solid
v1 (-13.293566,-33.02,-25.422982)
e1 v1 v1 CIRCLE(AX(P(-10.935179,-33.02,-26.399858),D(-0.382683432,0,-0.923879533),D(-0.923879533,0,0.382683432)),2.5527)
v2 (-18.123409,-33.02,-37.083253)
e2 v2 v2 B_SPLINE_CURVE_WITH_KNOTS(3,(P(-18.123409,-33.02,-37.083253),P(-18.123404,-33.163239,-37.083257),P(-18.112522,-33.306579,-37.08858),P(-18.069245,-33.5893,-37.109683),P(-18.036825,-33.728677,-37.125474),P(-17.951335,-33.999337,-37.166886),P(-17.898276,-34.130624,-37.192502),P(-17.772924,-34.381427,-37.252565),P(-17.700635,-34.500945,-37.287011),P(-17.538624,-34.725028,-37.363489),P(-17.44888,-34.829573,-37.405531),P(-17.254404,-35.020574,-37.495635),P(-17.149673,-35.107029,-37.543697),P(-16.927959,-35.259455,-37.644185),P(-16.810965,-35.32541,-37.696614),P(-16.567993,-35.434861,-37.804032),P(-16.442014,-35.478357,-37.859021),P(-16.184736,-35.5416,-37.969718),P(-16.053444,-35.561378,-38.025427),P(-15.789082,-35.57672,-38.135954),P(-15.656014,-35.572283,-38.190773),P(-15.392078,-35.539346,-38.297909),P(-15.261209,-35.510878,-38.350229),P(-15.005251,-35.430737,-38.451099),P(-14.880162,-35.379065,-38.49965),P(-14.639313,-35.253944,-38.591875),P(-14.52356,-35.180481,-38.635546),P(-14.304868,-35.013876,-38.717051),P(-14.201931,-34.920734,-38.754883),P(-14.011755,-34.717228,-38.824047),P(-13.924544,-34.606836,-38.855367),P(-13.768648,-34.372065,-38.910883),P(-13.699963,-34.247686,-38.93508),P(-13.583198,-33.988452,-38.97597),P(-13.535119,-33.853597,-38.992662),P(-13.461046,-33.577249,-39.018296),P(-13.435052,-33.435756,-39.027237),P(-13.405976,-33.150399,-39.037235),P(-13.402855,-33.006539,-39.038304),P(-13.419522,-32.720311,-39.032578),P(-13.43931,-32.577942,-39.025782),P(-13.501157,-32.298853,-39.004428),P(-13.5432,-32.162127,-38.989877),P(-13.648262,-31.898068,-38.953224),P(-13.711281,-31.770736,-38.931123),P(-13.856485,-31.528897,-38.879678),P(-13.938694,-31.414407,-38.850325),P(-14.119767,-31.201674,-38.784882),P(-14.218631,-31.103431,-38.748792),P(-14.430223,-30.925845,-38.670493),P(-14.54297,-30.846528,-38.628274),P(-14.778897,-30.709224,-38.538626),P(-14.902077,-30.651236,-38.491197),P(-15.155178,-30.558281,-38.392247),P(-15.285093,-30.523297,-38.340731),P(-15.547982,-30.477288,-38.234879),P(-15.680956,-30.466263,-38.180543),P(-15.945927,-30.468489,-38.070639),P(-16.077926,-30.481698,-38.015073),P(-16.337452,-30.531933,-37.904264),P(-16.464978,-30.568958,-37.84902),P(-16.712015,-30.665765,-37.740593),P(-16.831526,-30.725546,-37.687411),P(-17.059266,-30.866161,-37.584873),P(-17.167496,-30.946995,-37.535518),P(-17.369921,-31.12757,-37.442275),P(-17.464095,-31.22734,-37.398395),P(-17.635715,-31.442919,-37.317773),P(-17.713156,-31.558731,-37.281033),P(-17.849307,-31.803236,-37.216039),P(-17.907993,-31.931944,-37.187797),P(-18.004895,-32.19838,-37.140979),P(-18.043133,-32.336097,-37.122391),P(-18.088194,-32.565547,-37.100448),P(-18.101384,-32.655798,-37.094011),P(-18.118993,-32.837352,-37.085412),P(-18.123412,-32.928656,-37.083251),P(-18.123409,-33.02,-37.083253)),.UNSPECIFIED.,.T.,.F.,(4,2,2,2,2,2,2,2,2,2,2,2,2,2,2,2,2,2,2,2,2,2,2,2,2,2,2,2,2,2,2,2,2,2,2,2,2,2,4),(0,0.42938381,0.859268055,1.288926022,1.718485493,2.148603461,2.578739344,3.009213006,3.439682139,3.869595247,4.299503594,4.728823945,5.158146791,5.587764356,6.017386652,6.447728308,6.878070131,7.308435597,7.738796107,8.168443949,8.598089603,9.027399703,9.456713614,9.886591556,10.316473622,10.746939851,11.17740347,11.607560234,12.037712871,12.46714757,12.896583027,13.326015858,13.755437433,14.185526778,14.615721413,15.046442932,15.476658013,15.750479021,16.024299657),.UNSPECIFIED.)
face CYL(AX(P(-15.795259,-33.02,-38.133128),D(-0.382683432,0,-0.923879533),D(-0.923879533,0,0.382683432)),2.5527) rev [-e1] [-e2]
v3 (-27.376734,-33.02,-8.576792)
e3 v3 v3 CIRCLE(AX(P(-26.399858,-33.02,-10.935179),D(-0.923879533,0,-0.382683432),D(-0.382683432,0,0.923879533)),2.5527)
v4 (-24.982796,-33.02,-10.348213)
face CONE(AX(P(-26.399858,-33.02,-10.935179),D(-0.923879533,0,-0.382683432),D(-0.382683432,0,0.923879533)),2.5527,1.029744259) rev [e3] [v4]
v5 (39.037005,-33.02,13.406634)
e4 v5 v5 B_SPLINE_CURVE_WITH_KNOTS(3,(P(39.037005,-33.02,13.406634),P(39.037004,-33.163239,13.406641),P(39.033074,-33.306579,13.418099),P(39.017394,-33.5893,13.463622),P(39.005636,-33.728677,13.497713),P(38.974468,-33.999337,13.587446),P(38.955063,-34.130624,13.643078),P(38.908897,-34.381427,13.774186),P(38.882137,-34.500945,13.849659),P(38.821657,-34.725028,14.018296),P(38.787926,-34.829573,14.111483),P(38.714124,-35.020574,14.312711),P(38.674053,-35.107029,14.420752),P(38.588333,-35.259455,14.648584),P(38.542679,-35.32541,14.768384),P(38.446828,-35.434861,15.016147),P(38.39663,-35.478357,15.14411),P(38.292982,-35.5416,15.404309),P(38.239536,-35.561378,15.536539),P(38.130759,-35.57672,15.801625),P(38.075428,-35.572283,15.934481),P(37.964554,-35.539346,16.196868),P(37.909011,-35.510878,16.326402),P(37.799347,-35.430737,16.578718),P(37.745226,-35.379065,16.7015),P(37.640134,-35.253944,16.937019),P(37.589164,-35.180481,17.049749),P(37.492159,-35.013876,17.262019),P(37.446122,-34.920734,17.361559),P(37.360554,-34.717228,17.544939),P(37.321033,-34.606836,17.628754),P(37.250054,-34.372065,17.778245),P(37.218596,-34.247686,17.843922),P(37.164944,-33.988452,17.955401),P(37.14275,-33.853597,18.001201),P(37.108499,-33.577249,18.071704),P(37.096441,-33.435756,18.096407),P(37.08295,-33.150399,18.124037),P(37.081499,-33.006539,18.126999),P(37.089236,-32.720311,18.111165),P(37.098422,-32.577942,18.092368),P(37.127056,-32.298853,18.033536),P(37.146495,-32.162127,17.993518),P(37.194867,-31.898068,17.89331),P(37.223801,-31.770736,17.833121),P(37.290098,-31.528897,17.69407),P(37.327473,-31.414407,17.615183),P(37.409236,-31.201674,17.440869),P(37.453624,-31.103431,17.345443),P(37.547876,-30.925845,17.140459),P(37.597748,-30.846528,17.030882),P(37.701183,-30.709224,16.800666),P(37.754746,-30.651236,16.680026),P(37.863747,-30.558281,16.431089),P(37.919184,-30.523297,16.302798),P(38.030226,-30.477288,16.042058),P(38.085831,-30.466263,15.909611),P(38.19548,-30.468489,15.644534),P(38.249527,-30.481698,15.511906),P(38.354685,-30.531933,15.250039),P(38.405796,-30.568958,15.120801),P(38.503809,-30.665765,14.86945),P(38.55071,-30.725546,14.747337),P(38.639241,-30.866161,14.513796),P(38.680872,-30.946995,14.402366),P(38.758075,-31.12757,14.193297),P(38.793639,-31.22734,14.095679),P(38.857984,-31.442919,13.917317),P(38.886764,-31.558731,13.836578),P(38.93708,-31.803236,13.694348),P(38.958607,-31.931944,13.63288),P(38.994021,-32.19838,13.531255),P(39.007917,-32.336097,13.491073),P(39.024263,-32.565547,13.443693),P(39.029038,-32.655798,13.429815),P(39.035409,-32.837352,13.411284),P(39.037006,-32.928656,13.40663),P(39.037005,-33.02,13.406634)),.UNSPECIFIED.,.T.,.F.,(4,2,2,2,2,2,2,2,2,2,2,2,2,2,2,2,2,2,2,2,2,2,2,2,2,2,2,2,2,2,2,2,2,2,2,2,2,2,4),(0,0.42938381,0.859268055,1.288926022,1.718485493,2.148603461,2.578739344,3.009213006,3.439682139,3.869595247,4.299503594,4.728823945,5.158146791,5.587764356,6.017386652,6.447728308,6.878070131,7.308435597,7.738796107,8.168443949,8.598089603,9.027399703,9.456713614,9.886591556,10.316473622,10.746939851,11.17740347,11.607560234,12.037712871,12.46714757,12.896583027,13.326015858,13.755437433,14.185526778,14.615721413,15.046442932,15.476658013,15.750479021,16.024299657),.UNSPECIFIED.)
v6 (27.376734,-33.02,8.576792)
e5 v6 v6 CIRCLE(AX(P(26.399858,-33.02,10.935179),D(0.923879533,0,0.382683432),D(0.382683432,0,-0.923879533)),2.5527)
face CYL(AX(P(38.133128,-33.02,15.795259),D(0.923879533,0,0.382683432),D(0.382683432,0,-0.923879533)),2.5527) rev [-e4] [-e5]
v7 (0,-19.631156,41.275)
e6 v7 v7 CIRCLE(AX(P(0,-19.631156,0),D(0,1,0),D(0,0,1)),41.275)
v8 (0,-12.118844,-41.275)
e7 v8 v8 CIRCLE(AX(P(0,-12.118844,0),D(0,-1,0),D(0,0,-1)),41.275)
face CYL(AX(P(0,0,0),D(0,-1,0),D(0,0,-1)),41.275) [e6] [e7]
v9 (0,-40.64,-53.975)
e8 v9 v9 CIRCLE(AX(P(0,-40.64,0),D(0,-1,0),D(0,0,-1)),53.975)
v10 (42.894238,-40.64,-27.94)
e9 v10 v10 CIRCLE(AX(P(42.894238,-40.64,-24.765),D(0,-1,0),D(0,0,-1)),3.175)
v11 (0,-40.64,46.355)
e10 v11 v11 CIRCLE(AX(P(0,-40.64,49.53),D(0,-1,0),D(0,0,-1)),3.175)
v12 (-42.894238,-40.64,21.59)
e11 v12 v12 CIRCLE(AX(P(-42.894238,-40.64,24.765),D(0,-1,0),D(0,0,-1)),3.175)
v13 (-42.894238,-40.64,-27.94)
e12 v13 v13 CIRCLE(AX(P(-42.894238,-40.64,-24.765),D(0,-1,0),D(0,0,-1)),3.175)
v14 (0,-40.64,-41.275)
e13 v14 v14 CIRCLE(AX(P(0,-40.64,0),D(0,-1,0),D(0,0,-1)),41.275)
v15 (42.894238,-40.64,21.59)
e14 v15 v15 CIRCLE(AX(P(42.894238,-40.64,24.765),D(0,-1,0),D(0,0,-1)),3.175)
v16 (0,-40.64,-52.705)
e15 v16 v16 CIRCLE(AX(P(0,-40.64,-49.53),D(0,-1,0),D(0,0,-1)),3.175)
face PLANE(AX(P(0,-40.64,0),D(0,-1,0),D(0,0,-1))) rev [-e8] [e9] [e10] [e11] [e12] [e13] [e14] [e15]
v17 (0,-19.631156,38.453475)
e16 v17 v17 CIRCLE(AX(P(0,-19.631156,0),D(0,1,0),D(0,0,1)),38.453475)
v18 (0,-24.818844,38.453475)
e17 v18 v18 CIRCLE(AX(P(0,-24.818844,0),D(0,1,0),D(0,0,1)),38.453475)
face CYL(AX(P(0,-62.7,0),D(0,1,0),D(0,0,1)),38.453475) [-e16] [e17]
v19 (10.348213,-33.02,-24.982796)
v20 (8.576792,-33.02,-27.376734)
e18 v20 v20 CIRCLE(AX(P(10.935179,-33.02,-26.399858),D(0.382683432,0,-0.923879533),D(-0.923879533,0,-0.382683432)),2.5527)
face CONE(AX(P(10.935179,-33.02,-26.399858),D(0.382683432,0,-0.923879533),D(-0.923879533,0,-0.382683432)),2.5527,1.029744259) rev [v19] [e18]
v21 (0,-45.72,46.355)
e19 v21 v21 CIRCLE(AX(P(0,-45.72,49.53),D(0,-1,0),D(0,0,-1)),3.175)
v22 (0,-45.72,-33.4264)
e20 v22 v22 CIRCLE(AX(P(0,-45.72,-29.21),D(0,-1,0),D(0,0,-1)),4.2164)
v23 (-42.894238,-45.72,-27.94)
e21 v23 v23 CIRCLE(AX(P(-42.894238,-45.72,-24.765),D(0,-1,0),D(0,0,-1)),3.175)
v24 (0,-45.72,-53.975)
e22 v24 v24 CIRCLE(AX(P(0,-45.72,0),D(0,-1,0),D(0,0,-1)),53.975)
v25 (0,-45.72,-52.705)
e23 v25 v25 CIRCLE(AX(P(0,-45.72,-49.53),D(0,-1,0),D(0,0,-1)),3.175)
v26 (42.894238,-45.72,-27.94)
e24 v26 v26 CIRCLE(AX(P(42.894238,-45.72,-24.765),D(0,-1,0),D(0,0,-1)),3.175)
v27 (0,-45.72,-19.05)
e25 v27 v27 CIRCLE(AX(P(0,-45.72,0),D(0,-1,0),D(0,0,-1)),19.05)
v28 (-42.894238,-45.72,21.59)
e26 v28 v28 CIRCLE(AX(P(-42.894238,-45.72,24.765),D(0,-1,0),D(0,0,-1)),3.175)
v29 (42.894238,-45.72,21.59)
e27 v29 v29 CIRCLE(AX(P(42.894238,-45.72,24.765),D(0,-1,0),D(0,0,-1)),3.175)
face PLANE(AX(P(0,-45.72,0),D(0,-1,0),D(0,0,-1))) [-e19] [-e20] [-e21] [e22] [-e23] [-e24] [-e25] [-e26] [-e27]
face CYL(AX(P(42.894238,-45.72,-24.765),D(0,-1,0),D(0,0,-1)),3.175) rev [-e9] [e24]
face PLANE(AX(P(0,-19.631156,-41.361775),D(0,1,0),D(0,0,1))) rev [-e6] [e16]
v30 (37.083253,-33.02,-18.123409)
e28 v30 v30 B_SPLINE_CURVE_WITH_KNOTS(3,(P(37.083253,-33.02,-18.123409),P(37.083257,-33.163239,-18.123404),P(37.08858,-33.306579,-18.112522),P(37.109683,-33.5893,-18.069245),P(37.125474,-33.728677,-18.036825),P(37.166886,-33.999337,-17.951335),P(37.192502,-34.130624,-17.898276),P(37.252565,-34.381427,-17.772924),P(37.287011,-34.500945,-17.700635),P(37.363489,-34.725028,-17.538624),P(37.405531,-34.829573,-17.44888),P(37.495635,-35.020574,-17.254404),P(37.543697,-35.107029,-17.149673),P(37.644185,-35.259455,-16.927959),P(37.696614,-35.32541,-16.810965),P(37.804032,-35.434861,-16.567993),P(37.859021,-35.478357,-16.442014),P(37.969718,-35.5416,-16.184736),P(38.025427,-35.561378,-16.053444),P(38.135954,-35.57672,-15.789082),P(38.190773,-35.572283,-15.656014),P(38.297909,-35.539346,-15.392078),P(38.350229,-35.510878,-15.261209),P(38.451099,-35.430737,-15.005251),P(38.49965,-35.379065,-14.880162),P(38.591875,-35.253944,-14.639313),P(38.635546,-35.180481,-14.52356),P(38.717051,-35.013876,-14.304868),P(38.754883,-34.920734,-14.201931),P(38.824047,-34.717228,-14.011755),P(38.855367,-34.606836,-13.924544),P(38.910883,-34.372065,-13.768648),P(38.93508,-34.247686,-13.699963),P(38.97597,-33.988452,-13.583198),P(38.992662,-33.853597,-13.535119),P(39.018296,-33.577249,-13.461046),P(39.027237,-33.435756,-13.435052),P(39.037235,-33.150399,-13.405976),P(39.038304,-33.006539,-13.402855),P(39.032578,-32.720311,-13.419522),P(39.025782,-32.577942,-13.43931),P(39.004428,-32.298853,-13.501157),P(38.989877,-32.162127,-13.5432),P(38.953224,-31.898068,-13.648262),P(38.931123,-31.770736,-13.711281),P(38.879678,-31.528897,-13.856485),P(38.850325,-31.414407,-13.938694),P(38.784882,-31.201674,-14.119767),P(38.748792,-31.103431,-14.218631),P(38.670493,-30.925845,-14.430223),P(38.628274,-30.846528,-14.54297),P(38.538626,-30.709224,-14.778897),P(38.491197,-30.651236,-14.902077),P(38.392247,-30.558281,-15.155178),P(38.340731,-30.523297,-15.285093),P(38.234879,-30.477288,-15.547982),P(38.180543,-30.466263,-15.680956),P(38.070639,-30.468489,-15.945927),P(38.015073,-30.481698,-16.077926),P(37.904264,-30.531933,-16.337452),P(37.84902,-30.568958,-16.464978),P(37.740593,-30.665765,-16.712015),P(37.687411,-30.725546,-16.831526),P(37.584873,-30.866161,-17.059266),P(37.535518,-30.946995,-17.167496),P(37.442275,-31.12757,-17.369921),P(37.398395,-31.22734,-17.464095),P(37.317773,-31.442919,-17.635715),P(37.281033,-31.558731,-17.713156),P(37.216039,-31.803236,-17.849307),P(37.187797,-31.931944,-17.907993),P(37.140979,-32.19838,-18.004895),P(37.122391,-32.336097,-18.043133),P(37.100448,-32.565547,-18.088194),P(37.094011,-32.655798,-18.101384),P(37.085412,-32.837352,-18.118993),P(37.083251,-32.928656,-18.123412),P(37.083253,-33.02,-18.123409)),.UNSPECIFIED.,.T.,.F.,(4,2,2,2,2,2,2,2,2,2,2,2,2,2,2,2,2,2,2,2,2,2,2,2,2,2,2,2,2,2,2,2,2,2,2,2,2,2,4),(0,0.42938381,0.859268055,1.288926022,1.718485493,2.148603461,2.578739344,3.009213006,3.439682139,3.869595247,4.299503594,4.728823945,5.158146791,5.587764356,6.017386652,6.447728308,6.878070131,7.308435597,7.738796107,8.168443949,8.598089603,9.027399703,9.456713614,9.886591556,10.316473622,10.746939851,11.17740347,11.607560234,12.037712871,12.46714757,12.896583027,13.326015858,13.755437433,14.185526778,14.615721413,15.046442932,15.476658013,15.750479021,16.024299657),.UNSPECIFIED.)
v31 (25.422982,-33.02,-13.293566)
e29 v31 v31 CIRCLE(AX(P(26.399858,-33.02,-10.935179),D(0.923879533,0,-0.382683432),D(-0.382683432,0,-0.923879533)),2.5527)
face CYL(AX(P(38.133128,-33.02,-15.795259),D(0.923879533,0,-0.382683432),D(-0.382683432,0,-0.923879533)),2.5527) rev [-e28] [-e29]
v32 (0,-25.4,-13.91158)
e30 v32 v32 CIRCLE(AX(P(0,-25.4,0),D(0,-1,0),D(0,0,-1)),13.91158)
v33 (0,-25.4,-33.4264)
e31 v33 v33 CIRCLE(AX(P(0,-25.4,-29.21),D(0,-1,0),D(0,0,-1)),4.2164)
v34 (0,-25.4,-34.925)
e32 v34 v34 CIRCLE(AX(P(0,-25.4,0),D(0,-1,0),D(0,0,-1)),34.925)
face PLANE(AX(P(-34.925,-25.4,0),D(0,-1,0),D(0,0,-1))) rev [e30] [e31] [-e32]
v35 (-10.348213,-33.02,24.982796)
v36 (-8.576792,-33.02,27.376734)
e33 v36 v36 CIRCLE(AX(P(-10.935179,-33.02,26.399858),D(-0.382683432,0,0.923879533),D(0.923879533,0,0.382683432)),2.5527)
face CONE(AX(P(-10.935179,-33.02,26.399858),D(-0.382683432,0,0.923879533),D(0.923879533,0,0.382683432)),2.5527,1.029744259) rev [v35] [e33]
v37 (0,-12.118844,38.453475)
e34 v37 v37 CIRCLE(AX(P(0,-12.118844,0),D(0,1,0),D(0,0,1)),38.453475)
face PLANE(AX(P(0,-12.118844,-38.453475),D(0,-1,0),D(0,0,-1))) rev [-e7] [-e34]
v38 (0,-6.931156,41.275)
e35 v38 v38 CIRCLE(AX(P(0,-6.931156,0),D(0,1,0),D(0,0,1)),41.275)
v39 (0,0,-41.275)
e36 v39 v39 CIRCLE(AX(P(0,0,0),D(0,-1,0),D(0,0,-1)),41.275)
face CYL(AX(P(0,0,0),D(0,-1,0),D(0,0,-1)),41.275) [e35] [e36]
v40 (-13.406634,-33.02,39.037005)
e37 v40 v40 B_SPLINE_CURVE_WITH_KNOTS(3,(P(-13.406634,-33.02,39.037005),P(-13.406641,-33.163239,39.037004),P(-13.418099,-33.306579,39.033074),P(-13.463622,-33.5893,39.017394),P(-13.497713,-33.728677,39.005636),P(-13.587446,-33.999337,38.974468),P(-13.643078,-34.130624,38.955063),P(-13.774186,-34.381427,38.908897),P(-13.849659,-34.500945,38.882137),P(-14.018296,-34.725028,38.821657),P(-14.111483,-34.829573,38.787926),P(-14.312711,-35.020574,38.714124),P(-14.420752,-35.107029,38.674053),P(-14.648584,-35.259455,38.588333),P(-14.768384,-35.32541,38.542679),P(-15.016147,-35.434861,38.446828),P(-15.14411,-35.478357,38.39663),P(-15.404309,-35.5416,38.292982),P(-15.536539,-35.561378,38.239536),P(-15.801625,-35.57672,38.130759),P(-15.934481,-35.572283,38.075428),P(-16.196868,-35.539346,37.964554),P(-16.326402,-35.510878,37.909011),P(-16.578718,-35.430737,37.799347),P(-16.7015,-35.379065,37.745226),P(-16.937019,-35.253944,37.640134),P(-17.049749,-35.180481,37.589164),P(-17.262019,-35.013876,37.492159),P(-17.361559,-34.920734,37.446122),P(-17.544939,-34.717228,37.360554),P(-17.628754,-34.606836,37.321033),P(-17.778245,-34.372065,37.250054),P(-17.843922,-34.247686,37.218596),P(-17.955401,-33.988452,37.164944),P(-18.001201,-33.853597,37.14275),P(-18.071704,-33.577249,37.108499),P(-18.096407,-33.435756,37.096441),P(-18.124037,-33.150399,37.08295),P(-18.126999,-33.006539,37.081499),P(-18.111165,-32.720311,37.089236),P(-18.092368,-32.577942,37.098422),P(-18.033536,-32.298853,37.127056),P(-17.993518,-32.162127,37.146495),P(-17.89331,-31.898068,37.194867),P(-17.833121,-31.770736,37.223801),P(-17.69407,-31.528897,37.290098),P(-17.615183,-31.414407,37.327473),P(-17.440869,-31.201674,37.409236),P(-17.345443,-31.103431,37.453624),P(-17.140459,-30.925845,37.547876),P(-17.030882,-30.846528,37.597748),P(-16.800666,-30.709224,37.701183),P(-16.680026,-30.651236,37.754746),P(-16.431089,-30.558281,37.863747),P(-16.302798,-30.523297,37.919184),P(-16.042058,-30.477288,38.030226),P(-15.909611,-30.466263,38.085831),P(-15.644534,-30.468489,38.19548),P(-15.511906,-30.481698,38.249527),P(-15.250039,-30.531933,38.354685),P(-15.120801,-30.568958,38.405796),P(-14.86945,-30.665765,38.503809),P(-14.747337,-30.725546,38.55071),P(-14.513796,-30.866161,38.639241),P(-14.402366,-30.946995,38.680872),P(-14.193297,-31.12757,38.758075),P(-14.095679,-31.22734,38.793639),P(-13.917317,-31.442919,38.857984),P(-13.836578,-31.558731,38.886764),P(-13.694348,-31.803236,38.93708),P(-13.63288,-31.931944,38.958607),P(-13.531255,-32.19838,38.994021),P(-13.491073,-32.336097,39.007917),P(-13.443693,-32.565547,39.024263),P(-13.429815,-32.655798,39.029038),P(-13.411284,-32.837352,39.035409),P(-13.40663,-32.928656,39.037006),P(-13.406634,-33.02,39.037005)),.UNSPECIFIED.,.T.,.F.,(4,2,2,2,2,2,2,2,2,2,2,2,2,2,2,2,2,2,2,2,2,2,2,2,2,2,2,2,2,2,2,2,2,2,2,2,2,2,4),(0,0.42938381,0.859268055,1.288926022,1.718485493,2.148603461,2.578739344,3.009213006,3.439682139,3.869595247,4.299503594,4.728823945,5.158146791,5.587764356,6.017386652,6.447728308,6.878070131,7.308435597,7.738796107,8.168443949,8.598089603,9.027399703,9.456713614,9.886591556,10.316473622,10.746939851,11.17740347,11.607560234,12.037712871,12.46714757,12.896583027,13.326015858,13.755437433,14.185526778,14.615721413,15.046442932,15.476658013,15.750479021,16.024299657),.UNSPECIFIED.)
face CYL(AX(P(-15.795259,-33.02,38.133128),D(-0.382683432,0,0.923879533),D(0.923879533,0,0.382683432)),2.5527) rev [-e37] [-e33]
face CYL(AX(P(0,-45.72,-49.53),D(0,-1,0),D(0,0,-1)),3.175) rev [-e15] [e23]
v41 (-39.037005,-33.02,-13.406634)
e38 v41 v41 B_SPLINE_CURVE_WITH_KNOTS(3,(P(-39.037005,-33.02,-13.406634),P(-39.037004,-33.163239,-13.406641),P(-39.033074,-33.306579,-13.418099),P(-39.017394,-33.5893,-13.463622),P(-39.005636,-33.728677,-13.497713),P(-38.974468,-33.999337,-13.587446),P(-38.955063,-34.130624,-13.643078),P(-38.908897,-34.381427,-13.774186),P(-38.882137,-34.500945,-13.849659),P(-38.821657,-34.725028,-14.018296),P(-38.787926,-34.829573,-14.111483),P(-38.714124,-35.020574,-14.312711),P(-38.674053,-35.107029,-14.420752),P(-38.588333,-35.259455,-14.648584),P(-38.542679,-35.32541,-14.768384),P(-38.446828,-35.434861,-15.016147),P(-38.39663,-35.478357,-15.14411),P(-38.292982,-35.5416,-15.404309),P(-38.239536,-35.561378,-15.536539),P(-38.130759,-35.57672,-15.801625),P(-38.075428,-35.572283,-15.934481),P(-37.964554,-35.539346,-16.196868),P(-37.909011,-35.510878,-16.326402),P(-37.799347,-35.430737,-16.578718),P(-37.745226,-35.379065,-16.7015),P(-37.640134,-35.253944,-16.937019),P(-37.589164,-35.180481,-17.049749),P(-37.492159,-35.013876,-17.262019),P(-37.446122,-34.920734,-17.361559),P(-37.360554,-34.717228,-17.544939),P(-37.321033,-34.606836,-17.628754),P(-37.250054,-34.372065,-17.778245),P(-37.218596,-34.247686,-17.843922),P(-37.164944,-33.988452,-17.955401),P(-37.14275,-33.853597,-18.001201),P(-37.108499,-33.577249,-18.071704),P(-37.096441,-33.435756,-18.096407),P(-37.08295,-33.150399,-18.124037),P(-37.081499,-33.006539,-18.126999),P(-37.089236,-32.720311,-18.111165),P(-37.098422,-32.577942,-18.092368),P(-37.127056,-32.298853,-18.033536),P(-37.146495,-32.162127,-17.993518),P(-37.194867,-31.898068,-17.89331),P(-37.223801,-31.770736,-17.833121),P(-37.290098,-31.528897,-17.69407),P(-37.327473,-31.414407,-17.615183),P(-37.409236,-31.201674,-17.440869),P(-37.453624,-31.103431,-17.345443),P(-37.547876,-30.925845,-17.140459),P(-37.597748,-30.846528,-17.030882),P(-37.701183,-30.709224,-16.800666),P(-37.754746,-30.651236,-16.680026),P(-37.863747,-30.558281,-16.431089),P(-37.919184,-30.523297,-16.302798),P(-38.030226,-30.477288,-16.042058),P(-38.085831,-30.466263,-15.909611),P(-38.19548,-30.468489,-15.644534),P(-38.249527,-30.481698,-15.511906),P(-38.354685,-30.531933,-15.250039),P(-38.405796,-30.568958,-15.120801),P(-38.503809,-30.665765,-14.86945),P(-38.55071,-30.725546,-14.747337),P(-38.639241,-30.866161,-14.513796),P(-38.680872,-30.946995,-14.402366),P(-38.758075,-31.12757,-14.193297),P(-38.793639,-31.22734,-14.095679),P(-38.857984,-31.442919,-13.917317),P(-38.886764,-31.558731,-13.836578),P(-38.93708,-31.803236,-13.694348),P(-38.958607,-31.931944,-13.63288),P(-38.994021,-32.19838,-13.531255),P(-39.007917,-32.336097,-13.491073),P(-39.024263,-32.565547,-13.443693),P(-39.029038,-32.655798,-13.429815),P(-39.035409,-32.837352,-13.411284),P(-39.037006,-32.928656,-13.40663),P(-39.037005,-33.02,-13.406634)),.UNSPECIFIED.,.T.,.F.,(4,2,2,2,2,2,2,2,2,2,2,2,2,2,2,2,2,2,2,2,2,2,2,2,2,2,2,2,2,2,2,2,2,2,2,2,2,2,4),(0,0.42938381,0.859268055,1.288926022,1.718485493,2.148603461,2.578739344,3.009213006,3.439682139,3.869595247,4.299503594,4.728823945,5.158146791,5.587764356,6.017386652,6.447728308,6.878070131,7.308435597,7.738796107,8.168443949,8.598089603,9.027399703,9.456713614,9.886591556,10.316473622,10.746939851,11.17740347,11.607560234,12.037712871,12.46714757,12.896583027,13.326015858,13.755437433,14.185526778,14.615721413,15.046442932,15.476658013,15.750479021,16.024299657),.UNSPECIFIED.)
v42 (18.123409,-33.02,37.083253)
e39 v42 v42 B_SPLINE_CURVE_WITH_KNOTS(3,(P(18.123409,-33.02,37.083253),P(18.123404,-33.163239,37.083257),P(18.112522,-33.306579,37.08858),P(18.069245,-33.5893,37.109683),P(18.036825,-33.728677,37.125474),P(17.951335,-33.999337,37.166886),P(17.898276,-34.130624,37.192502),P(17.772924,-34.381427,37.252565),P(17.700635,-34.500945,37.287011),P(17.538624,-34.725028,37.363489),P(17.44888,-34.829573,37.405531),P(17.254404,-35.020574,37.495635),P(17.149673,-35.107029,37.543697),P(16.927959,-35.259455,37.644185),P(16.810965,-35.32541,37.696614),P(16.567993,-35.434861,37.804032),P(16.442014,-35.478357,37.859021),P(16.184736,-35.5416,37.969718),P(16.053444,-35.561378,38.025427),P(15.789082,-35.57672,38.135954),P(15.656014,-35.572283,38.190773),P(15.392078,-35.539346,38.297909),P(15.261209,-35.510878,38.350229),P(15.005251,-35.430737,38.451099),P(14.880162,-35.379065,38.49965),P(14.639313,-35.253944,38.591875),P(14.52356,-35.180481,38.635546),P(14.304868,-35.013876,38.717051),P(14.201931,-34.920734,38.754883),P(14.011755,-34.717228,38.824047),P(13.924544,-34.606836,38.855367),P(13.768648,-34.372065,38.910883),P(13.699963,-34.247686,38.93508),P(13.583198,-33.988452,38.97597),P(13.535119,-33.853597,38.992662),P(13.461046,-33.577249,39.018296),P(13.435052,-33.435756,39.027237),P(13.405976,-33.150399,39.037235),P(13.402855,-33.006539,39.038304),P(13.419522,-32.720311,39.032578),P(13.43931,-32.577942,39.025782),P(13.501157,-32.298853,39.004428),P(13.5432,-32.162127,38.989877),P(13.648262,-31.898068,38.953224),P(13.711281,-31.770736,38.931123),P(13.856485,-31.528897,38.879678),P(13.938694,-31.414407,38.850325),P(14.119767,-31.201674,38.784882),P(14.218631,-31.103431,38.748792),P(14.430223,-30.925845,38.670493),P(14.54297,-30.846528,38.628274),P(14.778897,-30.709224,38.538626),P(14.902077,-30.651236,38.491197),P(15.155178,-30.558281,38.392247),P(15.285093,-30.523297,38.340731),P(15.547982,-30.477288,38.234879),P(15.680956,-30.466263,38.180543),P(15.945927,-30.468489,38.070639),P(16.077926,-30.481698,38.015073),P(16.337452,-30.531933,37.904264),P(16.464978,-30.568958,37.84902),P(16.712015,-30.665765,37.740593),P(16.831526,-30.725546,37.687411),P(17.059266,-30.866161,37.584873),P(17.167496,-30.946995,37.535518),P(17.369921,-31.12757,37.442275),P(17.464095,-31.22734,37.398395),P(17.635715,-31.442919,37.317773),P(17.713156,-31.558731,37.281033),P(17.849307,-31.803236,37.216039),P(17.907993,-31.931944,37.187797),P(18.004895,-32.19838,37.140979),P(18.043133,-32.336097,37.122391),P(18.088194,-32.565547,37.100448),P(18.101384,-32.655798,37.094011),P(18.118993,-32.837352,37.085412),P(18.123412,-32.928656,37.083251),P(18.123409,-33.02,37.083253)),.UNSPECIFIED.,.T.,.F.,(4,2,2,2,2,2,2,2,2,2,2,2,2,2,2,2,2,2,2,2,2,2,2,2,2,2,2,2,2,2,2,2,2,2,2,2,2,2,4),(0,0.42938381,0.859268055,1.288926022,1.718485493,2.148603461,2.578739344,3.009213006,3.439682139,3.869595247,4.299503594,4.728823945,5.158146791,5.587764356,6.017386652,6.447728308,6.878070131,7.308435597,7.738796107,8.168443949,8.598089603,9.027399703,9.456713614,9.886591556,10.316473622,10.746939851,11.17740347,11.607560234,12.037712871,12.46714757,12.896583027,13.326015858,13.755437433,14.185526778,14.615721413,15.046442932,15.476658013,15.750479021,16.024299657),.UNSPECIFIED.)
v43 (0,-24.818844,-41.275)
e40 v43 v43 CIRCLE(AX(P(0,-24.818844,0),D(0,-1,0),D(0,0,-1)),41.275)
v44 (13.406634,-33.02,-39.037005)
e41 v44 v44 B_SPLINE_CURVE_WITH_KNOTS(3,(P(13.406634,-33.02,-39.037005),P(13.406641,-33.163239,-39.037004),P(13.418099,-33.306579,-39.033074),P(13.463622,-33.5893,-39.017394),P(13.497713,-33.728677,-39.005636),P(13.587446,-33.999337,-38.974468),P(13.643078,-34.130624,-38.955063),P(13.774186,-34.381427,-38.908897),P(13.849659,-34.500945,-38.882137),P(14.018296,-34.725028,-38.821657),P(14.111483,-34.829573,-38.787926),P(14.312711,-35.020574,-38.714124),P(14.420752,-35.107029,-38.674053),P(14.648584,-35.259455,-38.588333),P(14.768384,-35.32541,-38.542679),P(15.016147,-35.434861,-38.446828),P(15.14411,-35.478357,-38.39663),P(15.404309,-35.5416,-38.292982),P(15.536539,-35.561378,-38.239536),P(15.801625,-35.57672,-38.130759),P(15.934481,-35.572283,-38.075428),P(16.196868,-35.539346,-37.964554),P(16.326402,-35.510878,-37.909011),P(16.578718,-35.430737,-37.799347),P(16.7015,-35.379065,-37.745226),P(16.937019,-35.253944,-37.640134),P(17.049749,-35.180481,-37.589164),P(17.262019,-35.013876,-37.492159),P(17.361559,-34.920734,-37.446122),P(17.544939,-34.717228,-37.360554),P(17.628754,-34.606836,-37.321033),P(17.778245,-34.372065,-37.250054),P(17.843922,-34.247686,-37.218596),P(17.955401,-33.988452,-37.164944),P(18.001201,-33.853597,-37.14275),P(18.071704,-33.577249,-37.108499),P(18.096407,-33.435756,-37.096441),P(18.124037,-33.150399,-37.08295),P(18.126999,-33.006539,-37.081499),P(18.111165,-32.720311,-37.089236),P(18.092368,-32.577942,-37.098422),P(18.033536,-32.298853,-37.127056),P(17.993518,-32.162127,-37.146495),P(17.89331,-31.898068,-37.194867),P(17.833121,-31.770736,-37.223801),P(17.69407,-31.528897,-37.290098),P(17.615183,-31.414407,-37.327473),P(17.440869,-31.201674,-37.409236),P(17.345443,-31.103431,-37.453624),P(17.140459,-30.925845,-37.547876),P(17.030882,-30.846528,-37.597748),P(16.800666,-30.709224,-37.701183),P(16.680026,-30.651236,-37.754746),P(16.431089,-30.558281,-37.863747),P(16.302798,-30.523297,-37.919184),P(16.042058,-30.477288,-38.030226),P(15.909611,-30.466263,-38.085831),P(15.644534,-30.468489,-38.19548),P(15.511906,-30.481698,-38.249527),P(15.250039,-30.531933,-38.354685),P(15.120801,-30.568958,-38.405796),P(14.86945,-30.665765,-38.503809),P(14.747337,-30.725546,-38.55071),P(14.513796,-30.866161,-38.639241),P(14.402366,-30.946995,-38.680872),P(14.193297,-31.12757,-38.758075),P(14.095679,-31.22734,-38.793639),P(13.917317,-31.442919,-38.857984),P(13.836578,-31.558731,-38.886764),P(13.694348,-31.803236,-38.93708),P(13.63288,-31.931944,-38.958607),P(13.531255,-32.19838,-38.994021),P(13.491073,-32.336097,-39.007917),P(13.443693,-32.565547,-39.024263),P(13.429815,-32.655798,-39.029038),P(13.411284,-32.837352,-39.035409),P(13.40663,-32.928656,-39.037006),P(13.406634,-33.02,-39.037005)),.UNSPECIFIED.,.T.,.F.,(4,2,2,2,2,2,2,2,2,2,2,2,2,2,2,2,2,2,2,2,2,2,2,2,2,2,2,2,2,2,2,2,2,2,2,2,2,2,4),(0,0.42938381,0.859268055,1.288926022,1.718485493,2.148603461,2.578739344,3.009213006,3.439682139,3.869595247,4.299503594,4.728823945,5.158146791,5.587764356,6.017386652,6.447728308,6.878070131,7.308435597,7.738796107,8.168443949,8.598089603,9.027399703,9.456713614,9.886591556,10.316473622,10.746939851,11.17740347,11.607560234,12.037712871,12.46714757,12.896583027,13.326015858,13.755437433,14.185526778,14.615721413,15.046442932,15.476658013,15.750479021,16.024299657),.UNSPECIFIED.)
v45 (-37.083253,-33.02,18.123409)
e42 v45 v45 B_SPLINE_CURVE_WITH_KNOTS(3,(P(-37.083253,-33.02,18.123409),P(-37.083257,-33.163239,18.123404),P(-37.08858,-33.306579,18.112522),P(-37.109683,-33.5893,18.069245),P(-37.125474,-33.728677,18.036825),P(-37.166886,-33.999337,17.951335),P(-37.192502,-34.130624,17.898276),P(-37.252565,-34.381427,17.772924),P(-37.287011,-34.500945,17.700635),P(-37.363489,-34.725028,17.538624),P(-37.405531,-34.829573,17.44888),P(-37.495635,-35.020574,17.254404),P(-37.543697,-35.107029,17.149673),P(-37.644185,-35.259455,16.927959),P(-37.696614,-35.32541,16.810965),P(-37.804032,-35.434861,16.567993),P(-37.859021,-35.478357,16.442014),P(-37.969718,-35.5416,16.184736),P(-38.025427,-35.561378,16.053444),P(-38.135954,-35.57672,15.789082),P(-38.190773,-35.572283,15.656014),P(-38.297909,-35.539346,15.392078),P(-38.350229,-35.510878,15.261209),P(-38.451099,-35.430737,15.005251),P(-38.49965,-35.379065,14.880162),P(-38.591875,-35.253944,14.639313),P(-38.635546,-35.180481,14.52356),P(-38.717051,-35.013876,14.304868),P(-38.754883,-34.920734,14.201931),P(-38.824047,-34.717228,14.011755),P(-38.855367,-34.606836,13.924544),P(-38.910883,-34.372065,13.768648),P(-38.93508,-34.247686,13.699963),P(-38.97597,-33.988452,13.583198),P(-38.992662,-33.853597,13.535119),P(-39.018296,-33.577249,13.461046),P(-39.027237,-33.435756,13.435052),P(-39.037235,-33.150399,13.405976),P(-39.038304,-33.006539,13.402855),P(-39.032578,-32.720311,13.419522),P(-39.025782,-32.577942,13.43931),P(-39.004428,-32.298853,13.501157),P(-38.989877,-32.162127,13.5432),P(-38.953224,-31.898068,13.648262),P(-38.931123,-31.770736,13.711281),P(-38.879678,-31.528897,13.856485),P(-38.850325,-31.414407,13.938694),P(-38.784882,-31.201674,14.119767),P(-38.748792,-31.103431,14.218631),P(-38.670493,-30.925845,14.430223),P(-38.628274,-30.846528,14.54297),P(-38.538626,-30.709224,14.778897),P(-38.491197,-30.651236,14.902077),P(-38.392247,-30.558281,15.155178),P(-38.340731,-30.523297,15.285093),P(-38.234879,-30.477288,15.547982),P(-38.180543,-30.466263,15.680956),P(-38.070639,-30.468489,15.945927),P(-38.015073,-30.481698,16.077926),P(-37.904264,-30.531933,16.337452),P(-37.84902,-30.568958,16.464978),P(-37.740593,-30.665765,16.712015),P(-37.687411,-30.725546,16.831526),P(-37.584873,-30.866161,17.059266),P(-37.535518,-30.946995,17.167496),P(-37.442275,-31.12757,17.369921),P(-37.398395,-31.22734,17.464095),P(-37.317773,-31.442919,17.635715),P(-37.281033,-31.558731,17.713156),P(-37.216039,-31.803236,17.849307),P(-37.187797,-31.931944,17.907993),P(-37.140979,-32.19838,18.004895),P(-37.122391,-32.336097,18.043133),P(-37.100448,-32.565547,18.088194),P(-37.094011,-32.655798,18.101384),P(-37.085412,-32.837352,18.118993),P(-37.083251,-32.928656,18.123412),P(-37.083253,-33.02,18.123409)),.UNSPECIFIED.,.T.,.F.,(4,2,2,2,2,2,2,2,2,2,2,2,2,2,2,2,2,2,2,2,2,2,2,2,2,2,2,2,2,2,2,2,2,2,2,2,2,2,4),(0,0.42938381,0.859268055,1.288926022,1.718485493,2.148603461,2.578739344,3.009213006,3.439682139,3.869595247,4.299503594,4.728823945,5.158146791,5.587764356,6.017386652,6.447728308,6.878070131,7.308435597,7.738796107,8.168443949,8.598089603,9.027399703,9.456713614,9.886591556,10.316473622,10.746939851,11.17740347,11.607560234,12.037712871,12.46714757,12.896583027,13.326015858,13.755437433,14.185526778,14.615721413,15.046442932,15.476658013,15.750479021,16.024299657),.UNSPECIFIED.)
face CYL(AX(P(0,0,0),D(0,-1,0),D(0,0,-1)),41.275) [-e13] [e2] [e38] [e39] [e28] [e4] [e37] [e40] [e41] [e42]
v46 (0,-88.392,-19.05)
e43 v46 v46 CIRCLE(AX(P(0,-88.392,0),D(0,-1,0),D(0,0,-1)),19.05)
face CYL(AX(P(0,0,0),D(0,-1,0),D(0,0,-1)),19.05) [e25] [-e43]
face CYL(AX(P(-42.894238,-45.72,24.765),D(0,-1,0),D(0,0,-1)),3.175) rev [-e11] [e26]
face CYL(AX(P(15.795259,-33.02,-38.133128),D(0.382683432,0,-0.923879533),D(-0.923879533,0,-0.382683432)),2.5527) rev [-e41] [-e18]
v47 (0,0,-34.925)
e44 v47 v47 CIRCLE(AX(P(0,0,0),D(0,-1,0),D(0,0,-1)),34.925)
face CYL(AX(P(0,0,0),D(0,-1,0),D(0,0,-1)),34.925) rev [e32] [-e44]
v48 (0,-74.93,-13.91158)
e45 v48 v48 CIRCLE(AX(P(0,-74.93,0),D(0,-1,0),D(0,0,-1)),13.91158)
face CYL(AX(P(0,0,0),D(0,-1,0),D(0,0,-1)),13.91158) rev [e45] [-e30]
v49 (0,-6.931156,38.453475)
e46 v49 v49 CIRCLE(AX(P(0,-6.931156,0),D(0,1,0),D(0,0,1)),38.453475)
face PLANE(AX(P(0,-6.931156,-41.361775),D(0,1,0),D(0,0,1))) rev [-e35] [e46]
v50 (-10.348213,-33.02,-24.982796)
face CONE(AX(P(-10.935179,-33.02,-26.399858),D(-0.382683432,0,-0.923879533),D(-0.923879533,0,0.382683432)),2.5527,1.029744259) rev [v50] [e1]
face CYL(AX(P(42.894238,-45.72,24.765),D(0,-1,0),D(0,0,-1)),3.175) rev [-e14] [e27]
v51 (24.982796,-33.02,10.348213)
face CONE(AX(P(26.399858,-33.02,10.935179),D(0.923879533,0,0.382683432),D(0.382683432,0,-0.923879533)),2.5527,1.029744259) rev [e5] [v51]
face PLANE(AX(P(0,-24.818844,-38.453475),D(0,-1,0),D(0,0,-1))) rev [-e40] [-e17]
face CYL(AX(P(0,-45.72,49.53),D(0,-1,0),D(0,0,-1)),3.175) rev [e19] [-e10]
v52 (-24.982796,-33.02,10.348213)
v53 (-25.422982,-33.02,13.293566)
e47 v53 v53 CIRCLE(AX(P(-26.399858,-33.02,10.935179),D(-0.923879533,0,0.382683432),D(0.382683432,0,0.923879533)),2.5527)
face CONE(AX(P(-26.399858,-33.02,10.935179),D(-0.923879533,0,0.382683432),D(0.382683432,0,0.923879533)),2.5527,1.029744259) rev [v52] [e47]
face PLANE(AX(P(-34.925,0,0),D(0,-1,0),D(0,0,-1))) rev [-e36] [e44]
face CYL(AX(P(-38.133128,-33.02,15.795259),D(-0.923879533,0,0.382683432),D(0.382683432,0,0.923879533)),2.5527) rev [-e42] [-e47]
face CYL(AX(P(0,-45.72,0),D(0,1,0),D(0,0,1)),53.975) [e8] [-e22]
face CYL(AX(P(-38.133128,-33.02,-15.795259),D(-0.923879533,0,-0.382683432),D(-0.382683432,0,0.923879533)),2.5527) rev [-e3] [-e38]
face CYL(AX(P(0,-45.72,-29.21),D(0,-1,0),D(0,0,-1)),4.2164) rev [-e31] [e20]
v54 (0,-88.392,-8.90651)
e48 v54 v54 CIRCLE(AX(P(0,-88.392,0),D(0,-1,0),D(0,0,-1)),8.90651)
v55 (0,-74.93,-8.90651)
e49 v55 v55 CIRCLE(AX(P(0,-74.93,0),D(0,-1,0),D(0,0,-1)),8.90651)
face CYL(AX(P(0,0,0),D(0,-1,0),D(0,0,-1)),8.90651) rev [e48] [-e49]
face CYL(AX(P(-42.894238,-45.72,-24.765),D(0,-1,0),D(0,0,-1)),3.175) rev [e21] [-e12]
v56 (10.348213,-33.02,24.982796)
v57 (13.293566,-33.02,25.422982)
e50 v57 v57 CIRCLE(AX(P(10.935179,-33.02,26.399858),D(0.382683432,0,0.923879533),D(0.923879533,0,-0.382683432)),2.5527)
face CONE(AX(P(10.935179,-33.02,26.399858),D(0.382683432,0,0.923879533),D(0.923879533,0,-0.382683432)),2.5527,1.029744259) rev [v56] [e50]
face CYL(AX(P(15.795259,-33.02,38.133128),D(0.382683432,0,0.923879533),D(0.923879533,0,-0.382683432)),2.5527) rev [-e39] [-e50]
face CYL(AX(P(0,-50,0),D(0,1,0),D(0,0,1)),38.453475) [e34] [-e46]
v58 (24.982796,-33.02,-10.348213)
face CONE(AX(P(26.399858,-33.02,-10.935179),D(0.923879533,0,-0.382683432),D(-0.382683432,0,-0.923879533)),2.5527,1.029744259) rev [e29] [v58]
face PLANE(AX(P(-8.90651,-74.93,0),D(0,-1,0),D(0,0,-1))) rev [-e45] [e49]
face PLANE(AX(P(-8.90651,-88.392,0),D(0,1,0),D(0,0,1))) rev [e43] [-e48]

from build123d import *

# Parameters (mm, degrees)
CIRPATTERN1_COUNT           = 8
LPATTERN1_START             = -24.818843944
LPATTERN1_OUTLINE_R         = 41.275
LPATTERN1_OUTLINE_R_2       = 38.453474767
LPATTERN1_DEPTH             = 5.187687888
LPATTERN1_START_2           = -12.118843944
LPATTERN1_2_OUTLINE_R       = 41.275
LPATTERN1_2_OUTLINE_R_2     = 38.453474767
LPATTERN1_2_DEPTH           = 5.187687888
SKETCH15_R                  = 53.975
SKETCH15_R_2                = 19.05
BOSS_EXTRUDE1_DEPTH         = 5.08
Q_0_332_DIAMETER_HOLE1_D    = 8.4328
F_1_4_0_25_DIAMETER_HOLE1_D = 6.35
CIRPATTERN2_COUNT           = 6


# Read off the part's stored shape, not the designer's step: LPattern1
with BuildPart() as part:
    # Sketch1 → Revolve1 (revolve)
    with BuildSketch(Plane.XY, mode=Mode.PRIVATE) as revolve1_sk:
        Polygon((-41.275, -40.64), (-41.275, 0), (-34.925, 0), (-34.925, -25.4), (-13.91158, -25.4), (-13.91158, -74.93), (-8.90651, -74.93), (-8.90651, -88.392), (-19.05, -88.392), (-19.05, -40.64), align=None)
    revolve(revolve1_sk.sketch.rotate(Axis((0, 0, 0), (0, 1, 0)), 270), axis=Axis((0, 0, 0), (0, 1, 0)))

    # Sketch8 → 1/4-20 Tapped Hole1 (revolve, cut)
    with BuildSketch(Plane(origin=(38.133127704, -33.02, -15.795258671), x_dir=(-0.38268343236509045, 0, -0.9238795325112865), z_dir=(0, 1, 0))):
        Polygon((0, 0), (0, 14.233816902), (2.5527, 12.7), (2.5527, 0), align=None)
    f_1_4_20_tapped_hole1 = revolve(axis=Axis((43.999762736, -33.02, -18.225298466), (-0.9238795325112865, 0, 0.38268343236509045)), mode=Mode.SUBTRACT)

    # CirPattern1: 1/4-20 Tapped Hole1 ×8 about axis
    cirpattern1_axis = Axis((0, -118.183018713, 0), (0, 1, 0))
    for i in range(1, CIRPATTERN1_COUNT):
        add(f_1_4_20_tapped_hole1.rotate(cirpattern1_axis, i * 360 / CIRPATTERN1_COUNT), mode=Mode.SUBTRACT)

    # LPattern1 outline → LPattern1 (cut)
    with BuildSketch(Plane(origin=(0, 0, 0), x_dir=(1, 0, 0), z_dir=(0, 1, 0)).offset(LPATTERN1_START)):
        Circle(LPATTERN1_OUTLINE_R)
        Circle(LPATTERN1_OUTLINE_R_2, mode=Mode.SUBTRACT)
    extrude(amount=LPATTERN1_DEPTH, mode=Mode.SUBTRACT)

    # LPattern1 2 outline → LPattern1 2 (cut)
    with BuildSketch(Plane(origin=(0, 0, 0), x_dir=(1, 0, 0), z_dir=(0, 1, 0)).offset(LPATTERN1_START_2)):
        Circle(LPATTERN1_2_OUTLINE_R)
        Circle(LPATTERN1_2_OUTLINE_R_2, mode=Mode.SUBTRACT)
    extrude(amount=LPATTERN1_2_DEPTH, mode=Mode.SUBTRACT)

    # Sketch15 → Boss-Extrude1 (add)
    with BuildSketch(Plane.XZ.offset(40.64)):
        with Locations(Location((0, 0, 0), (0, 0, 270))):
            Circle(SKETCH15_R)
        with Locations(Location((0, 0, 0), (0, 0, 270))):
            Circle(SKETCH15_R_2, mode=Mode.SUBTRACT)
    extrude(amount=BOSS_EXTRUDE1_DEPTH)

    # Q (0.332) Diameter Hole1 (through all)
    with Locations(Plane(origin=(0, -45.72, 0), x_dir=(-1, 0, 0), z_dir=(0, -1, 0))):
        with Locations((0, 29.21)):
            Hole(Q_0_332_DIAMETER_HOLE1_D / 2)

    # 1/4 (0.25) Diameter Hole1 (through all)
    with Locations(Plane(origin=(0, -45.72, 0), x_dir=(-1, 0, 0), z_dir=(0, -1, 0))):
        with Locations((0, 49.53)):
            f_1_4_0_25_diameter_hole1 = Hole(F_1_4_0_25_DIAMETER_HOLE1_D / 2)

    # CirPattern2: 1/4 (0.25) Diameter Hole1 ×6 about axis
    cirpattern2_axis = Axis((0, 0, 0), (0, 1, 0))
    for i in range(1, CIRPATTERN2_COUNT):
        add(f_1_4_0_25_diameter_hole1.rotate(cirpattern2_axis, i * 360 / CIRPATTERN2_COUNT), mode=Mode.SUBTRACT)


solid = part.part
